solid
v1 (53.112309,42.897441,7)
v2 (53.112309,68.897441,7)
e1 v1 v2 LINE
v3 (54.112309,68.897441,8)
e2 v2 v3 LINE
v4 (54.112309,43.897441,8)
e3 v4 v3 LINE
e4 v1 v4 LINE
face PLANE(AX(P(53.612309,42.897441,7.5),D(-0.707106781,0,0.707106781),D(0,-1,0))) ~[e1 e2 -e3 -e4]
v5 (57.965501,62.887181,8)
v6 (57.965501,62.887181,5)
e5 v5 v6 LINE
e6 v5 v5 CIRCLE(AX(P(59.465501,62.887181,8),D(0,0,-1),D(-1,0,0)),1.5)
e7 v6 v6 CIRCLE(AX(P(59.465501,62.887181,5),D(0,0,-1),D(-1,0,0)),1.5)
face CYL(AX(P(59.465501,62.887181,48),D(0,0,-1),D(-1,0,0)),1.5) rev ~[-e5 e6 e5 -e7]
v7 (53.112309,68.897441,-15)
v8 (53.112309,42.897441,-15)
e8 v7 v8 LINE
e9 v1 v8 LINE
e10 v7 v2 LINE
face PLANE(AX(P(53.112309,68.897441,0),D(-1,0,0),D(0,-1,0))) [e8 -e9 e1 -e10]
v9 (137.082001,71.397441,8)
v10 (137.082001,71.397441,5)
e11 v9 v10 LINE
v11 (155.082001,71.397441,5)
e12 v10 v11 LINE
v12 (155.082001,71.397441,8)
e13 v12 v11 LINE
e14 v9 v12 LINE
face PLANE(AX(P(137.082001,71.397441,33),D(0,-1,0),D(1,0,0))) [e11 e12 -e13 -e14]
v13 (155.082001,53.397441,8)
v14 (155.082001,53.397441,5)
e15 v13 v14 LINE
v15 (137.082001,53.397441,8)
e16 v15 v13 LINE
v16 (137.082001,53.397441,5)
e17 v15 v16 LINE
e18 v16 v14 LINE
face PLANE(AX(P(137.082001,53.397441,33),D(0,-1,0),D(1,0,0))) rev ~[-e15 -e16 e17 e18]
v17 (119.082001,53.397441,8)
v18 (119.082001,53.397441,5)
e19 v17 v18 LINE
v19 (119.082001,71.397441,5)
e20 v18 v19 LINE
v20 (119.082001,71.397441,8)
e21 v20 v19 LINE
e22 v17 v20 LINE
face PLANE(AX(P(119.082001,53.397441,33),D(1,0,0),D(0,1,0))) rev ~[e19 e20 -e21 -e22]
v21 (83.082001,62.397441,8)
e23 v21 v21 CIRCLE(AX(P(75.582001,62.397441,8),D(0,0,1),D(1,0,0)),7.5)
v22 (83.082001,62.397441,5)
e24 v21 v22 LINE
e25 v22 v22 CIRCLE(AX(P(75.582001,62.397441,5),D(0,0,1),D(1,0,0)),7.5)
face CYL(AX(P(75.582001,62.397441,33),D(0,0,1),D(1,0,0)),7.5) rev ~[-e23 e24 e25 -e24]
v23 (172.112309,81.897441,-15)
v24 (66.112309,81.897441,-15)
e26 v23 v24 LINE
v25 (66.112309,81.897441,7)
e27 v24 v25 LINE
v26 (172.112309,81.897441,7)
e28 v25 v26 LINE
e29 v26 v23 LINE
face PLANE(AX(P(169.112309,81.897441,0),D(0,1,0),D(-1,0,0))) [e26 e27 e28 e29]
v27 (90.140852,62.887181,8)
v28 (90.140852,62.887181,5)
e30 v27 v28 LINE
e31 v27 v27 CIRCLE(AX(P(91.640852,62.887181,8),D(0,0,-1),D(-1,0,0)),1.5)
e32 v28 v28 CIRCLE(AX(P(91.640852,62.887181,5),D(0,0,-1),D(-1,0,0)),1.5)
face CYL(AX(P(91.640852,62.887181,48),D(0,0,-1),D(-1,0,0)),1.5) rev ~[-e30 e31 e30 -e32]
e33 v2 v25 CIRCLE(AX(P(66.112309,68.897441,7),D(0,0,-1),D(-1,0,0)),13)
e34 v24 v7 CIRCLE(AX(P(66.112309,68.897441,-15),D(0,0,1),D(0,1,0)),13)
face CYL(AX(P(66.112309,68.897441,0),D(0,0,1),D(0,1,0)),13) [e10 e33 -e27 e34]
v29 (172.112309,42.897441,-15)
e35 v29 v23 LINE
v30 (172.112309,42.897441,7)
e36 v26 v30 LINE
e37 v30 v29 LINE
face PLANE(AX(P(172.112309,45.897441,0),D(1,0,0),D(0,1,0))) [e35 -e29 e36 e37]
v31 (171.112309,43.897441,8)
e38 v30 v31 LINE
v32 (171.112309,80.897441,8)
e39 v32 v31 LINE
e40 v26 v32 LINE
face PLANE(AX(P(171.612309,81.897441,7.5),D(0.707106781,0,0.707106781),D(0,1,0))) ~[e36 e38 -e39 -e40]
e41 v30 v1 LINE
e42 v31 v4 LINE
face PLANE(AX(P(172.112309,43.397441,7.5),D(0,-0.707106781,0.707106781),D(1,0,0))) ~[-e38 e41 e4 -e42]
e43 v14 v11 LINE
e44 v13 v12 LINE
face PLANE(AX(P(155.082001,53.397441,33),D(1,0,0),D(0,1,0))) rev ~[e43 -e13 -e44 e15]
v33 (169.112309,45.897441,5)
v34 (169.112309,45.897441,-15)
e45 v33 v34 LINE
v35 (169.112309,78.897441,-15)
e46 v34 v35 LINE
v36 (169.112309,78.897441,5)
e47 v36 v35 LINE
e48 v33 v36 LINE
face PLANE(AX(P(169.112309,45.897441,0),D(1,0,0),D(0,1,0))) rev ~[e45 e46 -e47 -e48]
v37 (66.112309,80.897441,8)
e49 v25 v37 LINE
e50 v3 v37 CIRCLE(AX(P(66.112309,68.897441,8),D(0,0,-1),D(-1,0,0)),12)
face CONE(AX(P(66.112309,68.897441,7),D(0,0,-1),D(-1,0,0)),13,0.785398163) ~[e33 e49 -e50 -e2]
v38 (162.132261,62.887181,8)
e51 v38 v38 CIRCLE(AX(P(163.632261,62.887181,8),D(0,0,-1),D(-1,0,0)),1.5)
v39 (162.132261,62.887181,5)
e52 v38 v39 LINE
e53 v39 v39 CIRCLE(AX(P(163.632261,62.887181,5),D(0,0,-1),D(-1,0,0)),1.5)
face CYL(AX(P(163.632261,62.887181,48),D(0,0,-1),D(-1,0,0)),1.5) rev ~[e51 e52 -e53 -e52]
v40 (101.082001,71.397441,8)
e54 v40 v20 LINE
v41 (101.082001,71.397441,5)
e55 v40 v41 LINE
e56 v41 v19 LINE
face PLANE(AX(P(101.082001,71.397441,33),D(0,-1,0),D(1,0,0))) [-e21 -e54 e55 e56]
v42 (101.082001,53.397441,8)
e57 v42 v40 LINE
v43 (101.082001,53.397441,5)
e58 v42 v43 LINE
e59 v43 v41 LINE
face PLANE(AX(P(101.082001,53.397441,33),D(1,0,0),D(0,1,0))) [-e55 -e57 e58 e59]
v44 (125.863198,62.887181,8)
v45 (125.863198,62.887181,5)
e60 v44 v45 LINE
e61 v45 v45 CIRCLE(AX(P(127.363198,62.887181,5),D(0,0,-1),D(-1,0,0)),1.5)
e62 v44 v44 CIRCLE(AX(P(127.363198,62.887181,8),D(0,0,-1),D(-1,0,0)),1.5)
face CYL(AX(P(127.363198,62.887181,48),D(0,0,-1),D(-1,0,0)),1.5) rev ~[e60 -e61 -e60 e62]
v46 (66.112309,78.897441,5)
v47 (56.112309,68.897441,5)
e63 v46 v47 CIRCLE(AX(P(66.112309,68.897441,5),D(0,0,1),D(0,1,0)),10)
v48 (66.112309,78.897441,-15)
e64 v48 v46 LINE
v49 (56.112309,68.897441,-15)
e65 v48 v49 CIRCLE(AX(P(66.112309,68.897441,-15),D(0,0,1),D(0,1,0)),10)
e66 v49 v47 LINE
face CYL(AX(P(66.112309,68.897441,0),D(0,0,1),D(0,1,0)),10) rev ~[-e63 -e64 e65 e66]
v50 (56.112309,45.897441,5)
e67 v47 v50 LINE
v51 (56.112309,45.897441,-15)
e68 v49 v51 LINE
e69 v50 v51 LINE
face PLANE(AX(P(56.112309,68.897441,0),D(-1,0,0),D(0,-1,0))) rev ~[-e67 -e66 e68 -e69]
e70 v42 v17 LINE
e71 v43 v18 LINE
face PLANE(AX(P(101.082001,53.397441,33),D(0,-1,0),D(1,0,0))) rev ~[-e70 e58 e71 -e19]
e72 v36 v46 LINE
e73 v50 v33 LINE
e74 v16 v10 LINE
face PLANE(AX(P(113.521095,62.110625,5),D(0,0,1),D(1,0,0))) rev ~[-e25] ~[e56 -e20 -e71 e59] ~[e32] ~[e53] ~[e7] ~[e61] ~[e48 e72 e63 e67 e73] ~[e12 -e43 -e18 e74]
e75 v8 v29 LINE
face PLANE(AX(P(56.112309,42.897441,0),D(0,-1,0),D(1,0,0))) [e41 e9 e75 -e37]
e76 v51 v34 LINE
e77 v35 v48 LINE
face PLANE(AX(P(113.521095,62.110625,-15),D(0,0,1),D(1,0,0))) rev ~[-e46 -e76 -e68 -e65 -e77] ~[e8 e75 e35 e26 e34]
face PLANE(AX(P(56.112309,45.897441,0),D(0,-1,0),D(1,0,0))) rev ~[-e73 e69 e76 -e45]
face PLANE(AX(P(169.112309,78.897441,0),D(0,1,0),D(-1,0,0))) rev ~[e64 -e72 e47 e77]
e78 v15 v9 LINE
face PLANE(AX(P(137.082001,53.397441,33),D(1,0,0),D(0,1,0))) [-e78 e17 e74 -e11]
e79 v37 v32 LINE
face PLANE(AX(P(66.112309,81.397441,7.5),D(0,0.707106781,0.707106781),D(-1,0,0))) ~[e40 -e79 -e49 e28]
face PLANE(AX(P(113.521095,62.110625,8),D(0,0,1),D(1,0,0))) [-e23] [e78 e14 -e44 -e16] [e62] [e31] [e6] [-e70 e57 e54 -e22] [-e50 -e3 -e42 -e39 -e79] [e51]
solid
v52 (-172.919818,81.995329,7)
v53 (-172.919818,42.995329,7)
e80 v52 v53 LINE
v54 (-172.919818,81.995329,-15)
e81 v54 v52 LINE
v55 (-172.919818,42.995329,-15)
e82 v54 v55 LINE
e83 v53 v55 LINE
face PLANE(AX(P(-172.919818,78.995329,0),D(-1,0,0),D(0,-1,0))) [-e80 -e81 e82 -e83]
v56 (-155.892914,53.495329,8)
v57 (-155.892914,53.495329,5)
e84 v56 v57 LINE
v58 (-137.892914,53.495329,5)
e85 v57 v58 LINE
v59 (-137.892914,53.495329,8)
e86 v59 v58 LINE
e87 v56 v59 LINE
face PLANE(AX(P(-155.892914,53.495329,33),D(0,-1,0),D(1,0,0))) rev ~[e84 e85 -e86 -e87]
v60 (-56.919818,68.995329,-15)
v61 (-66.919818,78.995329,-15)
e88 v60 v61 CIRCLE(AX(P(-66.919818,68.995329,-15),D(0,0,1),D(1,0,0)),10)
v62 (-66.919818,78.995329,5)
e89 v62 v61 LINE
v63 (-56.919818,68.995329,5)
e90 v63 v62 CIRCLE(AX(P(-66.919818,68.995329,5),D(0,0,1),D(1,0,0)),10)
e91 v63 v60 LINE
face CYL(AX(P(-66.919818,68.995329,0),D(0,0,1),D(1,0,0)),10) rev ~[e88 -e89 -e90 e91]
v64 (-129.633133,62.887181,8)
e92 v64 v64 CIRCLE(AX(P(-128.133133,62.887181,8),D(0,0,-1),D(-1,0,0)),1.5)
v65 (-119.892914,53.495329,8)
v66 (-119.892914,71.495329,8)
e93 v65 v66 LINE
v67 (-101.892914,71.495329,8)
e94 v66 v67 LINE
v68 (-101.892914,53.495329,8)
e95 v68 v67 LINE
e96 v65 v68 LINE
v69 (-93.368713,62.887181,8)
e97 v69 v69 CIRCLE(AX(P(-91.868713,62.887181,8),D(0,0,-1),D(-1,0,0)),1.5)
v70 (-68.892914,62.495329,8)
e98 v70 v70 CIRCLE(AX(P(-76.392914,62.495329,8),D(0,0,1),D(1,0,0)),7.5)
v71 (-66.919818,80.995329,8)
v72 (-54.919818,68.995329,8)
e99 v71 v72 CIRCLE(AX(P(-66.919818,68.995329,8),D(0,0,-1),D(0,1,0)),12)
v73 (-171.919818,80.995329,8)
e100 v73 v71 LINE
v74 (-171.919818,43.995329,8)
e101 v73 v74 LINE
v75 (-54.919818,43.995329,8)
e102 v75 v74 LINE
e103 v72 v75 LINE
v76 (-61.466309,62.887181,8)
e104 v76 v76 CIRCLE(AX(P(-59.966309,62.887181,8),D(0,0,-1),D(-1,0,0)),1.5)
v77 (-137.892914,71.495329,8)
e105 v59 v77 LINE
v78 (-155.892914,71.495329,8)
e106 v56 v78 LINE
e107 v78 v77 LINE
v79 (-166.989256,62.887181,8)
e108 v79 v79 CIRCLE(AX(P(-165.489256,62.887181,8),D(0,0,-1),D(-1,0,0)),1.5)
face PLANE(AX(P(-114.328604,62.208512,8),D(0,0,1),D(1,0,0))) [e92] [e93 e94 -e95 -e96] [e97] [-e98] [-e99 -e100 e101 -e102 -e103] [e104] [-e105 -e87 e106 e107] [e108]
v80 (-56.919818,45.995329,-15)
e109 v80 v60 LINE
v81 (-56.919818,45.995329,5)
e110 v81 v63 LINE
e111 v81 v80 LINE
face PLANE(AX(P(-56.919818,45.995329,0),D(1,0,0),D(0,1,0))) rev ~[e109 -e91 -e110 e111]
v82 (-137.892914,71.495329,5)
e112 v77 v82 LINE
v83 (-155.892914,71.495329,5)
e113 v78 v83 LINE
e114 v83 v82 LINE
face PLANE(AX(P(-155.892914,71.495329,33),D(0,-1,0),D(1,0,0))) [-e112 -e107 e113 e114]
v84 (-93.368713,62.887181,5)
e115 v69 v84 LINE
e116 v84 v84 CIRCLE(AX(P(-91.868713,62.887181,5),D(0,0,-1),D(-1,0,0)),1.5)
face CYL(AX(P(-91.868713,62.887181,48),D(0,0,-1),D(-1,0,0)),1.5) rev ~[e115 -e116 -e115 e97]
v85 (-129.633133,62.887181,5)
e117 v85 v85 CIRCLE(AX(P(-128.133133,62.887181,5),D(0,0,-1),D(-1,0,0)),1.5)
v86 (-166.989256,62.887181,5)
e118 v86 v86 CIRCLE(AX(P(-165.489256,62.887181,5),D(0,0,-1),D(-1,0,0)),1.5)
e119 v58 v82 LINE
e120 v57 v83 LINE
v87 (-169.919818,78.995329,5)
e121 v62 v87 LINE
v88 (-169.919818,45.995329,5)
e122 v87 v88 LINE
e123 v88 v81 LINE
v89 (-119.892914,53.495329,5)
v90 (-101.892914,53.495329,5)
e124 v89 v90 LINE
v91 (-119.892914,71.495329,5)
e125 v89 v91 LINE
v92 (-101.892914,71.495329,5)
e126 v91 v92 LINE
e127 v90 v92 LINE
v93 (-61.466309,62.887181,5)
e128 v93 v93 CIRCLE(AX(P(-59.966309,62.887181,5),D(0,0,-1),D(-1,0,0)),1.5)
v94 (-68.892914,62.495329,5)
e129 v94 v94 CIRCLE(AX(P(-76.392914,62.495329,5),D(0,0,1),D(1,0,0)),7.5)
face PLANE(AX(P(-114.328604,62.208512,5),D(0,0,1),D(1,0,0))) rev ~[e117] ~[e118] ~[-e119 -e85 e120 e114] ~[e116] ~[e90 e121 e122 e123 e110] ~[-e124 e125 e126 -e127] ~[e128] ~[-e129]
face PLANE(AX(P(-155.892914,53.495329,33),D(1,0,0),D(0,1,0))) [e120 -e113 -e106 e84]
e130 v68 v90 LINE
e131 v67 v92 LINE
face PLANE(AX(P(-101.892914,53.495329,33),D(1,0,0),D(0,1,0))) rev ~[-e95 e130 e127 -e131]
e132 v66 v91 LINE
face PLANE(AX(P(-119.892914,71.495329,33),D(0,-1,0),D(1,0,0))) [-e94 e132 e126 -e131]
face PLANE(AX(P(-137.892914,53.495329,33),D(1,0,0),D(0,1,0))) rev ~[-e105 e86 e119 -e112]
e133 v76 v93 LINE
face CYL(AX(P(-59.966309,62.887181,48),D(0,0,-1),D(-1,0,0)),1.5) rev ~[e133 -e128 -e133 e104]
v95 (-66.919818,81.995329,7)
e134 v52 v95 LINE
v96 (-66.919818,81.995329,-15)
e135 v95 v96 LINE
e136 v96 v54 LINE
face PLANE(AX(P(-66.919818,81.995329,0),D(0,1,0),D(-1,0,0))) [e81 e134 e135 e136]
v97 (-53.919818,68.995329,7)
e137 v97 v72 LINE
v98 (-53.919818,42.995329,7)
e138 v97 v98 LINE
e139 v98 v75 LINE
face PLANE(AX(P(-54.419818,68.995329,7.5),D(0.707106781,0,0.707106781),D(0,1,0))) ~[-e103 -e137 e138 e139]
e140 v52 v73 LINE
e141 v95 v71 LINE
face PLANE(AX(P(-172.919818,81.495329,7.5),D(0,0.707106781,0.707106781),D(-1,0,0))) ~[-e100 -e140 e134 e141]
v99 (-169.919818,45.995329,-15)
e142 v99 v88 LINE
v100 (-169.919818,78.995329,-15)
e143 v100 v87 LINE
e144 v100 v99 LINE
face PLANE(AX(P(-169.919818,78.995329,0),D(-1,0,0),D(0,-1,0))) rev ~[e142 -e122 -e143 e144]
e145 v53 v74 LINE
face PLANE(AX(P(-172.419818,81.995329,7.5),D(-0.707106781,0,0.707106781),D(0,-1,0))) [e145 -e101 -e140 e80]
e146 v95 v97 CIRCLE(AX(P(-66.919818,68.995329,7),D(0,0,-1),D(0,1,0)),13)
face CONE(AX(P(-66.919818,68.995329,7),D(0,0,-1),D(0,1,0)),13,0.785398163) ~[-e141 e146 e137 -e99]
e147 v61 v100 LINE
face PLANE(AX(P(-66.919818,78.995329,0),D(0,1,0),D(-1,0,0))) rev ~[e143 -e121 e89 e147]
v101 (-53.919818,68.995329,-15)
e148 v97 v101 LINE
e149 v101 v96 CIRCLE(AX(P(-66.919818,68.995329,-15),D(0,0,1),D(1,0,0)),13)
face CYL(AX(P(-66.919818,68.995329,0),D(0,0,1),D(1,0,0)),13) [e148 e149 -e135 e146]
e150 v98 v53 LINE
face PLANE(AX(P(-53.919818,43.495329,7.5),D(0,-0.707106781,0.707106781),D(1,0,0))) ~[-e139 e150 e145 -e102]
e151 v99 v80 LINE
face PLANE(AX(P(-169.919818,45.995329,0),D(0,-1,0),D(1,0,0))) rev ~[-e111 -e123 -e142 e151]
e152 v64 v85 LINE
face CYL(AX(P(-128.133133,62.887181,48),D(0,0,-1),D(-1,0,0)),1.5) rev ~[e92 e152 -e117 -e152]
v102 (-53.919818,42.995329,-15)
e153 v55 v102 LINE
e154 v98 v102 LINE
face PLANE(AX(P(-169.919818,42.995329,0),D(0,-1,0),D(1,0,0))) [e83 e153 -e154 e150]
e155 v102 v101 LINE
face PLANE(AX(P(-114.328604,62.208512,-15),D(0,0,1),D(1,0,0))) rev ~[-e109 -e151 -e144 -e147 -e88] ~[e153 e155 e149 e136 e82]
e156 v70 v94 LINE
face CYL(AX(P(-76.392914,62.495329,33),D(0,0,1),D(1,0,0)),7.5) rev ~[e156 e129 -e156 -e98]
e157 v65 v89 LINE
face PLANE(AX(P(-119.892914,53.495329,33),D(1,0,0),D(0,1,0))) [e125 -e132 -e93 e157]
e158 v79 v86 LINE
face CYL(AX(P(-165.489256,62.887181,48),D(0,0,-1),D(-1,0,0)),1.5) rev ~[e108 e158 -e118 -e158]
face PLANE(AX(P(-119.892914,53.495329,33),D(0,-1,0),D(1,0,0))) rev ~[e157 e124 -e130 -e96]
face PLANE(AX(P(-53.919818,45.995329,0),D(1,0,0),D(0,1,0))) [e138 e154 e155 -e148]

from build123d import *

# Parameters (mm, degrees)
F1_DEPTH      = 5
F1_DEPTH_BACK = 15
F2_T          = 3
F2_2_T        = 3
F4_W          = 18
F4_H          = 18
F4_R          = 7.5
F5_DEPTH      = 50
F8_D          = 3
F8_DEPTH      = 40
F8_TIP        = 0.9012909285
F8_2_D        = 3
F8_2_DEPTH    = 40
F8_2_TIP      = 0.9012909285
F9_SIZE       = 1
F9_2_SIZE     = 1


with BuildPart() as f1:
    # F0 (on Top) → F1 (new body, two sides)
    with BuildSketch(Plane.XY) as f1_sk:
        with BuildLine():
            Line((169.1123094261, 78.8974409995), (66.1123094261, 78.8974409995))
            ThreePointArc((66.1123094261, 78.8974409995), (59.0412416142, 75.9685088113), (56.1123094261, 68.8974409995))
            Line((56.1123094261, 68.8974409995), (56.1123094261, 45.8974409995))
            Line((56.1123094261, 45.8974409995), (169.1123094261, 45.8974409995))
            Line((169.1123094261, 45.8974409995), (169.1123094261, 78.8974409995))
        make_face()
    extrude(amount=F1_DEPTH)
    extrude(f1_sk.sketch, amount=-F1_DEPTH_BACK)

    # F2
    f2_openings = [f1.faces().sort_by_distance(p)[0] for p in [
        (112.926417, 62.314864, -15),
    ]]
    offset(amount=F2_T, openings=f2_openings, kind=Kind.INTERSECTION)


with BuildPart() as f1b:
    # F0 (on Top) → F1, piece 2 (new body, two sides)
    with BuildSketch(Plane.XY) as f1_2_sk:
        with BuildLine():
            Line((-66.9198182523, 78.9953285099), (-169.9198182523, 78.9953285099))
            Line((-169.9198182523, 78.9953285099), (-169.9198182523, 45.9953285099))
            Line((-169.9198182523, 45.9953285099), (-56.9198182523, 45.9953285099))
            Line((-56.9198182523, 45.9953285099), (-56.9198182523, 68.9953285099))
            ThreePointArc((-56.9198182523, 68.9953285099), (-59.8487504405, 76.0663963218), (-66.9198182523, 78.9953285099))
        make_face()
    extrude(amount=F1_DEPTH)
    extrude(f1_2_sk.sketch, amount=-F1_DEPTH_BACK)

    # F2#2
    f2_2_openings = [f1b.faces().sort_by_distance(p)[0] for p in [
        (-113.733926, 62.412751, -15),
    ]]
    offset(amount=F2_2_T, openings=f2_2_openings, kind=Kind.INTERSECTION)


with BuildPart() as f5_tool:
    # F4 (on offset) → F5 (new body)
    with BuildSketch(Plane.XY.offset(33)):
        with Locations((-146.8929139701, 62.4953285099)):
            Rectangle(F4_W, F4_H)
        with Locations((-110.8929139701, 62.4953285099)):
            Rectangle(F4_W, F4_H)
        with Locations((-76.3929139701, 62.4953285099)):
            Circle(F4_R)
        with Locations((75.5820007977, 62.3974409995)):
            Circle(F4_R)
        with Locations((110.0820007977, 62.3974409995)):
            Rectangle(F4_W, F4_H)
        with Locations((146.0820007977, 62.3974409995)):
            Rectangle(F4_W, F4_H)
    extrude(amount=-F5_DEPTH)


with BuildPart() as f1_1:
    add(f1.part)

    # F5: cut by f5_tool
    add(f5_tool.part, mode=Mode.SUBTRACT)

    # F8
    with Locations(Plane.XY.offset(8)):
        with Locations((-128.1331330538, 62.8871805966), (163.6322605932, 62.8871805966), (127.36319817, 62.8871805966), (-165.489256382, 62.8871805966), (91.6408523917, 62.8871805966), (59.4655014575, 62.8871805966), (-91.8687133804, 62.8871805966), (-59.9663094311, 62.8871805966)):
            Hole(F8_D / 2, depth=F8_DEPTH)
            with Locations((0, 0, -(F8_DEPTH + F8_TIP / 2))):  # 118° drill point
                Cone(0, F8_D / 2, F8_TIP, mode=Mode.SUBTRACT)

    # F9
    f9_edges = [f1_1.edges().sort_by_distance(p)[0] for p in [
        (112.612309, 42.897441, 8),
        (172.112309, 62.397441, 8),
        (119.112309, 81.897441, 8),
        (56.919921, 78.089829, 8),
        (53.112309, 55.897441, 8),
    ]]
    chamfer(f9_edges, length=F9_SIZE)


with BuildPart() as f1b_1:
    add(f1b.part)

    # F5: cut by f5_tool
    add(f5_tool.part, mode=Mode.SUBTRACT)

    # F8#2
    with Locations(Plane.XY.offset(8)):
        with Locations((-128.1331330538, 62.8871805966), (163.6322605932, 62.8871805966), (127.36319817, 62.8871805966), (-165.489256382, 62.8871805966), (91.6408523917, 62.8871805966), (59.4655014575, 62.8871805966), (-91.8687133804, 62.8871805966), (-59.9663094311, 62.8871805966)):
            Hole(F8_2_D / 2, depth=F8_2_DEPTH)
            with Locations((0, 0, -(F8_2_DEPTH + F8_2_TIP / 2))):  # 118° drill point
                Cone(0, F8_2_D / 2, F8_2_TIP, mode=Mode.SUBTRACT)

    # F9#2
    f9_2_edges = [f1b_1.edges().sort_by_distance(p)[0] for p in [
        (-53.919818, 55.995329, 8),
        (-57.72743, 78.187717, 8),
        (-119.919818, 81.995329, 8),
        (-172.919818, 62.495329, 8),
        (-113.419818, 42.995329, 8),
    ]]
    chamfer(f9_2_edges, length=F9_2_SIZE)


solid = Compound([f1_1.part, f1b_1.part])
